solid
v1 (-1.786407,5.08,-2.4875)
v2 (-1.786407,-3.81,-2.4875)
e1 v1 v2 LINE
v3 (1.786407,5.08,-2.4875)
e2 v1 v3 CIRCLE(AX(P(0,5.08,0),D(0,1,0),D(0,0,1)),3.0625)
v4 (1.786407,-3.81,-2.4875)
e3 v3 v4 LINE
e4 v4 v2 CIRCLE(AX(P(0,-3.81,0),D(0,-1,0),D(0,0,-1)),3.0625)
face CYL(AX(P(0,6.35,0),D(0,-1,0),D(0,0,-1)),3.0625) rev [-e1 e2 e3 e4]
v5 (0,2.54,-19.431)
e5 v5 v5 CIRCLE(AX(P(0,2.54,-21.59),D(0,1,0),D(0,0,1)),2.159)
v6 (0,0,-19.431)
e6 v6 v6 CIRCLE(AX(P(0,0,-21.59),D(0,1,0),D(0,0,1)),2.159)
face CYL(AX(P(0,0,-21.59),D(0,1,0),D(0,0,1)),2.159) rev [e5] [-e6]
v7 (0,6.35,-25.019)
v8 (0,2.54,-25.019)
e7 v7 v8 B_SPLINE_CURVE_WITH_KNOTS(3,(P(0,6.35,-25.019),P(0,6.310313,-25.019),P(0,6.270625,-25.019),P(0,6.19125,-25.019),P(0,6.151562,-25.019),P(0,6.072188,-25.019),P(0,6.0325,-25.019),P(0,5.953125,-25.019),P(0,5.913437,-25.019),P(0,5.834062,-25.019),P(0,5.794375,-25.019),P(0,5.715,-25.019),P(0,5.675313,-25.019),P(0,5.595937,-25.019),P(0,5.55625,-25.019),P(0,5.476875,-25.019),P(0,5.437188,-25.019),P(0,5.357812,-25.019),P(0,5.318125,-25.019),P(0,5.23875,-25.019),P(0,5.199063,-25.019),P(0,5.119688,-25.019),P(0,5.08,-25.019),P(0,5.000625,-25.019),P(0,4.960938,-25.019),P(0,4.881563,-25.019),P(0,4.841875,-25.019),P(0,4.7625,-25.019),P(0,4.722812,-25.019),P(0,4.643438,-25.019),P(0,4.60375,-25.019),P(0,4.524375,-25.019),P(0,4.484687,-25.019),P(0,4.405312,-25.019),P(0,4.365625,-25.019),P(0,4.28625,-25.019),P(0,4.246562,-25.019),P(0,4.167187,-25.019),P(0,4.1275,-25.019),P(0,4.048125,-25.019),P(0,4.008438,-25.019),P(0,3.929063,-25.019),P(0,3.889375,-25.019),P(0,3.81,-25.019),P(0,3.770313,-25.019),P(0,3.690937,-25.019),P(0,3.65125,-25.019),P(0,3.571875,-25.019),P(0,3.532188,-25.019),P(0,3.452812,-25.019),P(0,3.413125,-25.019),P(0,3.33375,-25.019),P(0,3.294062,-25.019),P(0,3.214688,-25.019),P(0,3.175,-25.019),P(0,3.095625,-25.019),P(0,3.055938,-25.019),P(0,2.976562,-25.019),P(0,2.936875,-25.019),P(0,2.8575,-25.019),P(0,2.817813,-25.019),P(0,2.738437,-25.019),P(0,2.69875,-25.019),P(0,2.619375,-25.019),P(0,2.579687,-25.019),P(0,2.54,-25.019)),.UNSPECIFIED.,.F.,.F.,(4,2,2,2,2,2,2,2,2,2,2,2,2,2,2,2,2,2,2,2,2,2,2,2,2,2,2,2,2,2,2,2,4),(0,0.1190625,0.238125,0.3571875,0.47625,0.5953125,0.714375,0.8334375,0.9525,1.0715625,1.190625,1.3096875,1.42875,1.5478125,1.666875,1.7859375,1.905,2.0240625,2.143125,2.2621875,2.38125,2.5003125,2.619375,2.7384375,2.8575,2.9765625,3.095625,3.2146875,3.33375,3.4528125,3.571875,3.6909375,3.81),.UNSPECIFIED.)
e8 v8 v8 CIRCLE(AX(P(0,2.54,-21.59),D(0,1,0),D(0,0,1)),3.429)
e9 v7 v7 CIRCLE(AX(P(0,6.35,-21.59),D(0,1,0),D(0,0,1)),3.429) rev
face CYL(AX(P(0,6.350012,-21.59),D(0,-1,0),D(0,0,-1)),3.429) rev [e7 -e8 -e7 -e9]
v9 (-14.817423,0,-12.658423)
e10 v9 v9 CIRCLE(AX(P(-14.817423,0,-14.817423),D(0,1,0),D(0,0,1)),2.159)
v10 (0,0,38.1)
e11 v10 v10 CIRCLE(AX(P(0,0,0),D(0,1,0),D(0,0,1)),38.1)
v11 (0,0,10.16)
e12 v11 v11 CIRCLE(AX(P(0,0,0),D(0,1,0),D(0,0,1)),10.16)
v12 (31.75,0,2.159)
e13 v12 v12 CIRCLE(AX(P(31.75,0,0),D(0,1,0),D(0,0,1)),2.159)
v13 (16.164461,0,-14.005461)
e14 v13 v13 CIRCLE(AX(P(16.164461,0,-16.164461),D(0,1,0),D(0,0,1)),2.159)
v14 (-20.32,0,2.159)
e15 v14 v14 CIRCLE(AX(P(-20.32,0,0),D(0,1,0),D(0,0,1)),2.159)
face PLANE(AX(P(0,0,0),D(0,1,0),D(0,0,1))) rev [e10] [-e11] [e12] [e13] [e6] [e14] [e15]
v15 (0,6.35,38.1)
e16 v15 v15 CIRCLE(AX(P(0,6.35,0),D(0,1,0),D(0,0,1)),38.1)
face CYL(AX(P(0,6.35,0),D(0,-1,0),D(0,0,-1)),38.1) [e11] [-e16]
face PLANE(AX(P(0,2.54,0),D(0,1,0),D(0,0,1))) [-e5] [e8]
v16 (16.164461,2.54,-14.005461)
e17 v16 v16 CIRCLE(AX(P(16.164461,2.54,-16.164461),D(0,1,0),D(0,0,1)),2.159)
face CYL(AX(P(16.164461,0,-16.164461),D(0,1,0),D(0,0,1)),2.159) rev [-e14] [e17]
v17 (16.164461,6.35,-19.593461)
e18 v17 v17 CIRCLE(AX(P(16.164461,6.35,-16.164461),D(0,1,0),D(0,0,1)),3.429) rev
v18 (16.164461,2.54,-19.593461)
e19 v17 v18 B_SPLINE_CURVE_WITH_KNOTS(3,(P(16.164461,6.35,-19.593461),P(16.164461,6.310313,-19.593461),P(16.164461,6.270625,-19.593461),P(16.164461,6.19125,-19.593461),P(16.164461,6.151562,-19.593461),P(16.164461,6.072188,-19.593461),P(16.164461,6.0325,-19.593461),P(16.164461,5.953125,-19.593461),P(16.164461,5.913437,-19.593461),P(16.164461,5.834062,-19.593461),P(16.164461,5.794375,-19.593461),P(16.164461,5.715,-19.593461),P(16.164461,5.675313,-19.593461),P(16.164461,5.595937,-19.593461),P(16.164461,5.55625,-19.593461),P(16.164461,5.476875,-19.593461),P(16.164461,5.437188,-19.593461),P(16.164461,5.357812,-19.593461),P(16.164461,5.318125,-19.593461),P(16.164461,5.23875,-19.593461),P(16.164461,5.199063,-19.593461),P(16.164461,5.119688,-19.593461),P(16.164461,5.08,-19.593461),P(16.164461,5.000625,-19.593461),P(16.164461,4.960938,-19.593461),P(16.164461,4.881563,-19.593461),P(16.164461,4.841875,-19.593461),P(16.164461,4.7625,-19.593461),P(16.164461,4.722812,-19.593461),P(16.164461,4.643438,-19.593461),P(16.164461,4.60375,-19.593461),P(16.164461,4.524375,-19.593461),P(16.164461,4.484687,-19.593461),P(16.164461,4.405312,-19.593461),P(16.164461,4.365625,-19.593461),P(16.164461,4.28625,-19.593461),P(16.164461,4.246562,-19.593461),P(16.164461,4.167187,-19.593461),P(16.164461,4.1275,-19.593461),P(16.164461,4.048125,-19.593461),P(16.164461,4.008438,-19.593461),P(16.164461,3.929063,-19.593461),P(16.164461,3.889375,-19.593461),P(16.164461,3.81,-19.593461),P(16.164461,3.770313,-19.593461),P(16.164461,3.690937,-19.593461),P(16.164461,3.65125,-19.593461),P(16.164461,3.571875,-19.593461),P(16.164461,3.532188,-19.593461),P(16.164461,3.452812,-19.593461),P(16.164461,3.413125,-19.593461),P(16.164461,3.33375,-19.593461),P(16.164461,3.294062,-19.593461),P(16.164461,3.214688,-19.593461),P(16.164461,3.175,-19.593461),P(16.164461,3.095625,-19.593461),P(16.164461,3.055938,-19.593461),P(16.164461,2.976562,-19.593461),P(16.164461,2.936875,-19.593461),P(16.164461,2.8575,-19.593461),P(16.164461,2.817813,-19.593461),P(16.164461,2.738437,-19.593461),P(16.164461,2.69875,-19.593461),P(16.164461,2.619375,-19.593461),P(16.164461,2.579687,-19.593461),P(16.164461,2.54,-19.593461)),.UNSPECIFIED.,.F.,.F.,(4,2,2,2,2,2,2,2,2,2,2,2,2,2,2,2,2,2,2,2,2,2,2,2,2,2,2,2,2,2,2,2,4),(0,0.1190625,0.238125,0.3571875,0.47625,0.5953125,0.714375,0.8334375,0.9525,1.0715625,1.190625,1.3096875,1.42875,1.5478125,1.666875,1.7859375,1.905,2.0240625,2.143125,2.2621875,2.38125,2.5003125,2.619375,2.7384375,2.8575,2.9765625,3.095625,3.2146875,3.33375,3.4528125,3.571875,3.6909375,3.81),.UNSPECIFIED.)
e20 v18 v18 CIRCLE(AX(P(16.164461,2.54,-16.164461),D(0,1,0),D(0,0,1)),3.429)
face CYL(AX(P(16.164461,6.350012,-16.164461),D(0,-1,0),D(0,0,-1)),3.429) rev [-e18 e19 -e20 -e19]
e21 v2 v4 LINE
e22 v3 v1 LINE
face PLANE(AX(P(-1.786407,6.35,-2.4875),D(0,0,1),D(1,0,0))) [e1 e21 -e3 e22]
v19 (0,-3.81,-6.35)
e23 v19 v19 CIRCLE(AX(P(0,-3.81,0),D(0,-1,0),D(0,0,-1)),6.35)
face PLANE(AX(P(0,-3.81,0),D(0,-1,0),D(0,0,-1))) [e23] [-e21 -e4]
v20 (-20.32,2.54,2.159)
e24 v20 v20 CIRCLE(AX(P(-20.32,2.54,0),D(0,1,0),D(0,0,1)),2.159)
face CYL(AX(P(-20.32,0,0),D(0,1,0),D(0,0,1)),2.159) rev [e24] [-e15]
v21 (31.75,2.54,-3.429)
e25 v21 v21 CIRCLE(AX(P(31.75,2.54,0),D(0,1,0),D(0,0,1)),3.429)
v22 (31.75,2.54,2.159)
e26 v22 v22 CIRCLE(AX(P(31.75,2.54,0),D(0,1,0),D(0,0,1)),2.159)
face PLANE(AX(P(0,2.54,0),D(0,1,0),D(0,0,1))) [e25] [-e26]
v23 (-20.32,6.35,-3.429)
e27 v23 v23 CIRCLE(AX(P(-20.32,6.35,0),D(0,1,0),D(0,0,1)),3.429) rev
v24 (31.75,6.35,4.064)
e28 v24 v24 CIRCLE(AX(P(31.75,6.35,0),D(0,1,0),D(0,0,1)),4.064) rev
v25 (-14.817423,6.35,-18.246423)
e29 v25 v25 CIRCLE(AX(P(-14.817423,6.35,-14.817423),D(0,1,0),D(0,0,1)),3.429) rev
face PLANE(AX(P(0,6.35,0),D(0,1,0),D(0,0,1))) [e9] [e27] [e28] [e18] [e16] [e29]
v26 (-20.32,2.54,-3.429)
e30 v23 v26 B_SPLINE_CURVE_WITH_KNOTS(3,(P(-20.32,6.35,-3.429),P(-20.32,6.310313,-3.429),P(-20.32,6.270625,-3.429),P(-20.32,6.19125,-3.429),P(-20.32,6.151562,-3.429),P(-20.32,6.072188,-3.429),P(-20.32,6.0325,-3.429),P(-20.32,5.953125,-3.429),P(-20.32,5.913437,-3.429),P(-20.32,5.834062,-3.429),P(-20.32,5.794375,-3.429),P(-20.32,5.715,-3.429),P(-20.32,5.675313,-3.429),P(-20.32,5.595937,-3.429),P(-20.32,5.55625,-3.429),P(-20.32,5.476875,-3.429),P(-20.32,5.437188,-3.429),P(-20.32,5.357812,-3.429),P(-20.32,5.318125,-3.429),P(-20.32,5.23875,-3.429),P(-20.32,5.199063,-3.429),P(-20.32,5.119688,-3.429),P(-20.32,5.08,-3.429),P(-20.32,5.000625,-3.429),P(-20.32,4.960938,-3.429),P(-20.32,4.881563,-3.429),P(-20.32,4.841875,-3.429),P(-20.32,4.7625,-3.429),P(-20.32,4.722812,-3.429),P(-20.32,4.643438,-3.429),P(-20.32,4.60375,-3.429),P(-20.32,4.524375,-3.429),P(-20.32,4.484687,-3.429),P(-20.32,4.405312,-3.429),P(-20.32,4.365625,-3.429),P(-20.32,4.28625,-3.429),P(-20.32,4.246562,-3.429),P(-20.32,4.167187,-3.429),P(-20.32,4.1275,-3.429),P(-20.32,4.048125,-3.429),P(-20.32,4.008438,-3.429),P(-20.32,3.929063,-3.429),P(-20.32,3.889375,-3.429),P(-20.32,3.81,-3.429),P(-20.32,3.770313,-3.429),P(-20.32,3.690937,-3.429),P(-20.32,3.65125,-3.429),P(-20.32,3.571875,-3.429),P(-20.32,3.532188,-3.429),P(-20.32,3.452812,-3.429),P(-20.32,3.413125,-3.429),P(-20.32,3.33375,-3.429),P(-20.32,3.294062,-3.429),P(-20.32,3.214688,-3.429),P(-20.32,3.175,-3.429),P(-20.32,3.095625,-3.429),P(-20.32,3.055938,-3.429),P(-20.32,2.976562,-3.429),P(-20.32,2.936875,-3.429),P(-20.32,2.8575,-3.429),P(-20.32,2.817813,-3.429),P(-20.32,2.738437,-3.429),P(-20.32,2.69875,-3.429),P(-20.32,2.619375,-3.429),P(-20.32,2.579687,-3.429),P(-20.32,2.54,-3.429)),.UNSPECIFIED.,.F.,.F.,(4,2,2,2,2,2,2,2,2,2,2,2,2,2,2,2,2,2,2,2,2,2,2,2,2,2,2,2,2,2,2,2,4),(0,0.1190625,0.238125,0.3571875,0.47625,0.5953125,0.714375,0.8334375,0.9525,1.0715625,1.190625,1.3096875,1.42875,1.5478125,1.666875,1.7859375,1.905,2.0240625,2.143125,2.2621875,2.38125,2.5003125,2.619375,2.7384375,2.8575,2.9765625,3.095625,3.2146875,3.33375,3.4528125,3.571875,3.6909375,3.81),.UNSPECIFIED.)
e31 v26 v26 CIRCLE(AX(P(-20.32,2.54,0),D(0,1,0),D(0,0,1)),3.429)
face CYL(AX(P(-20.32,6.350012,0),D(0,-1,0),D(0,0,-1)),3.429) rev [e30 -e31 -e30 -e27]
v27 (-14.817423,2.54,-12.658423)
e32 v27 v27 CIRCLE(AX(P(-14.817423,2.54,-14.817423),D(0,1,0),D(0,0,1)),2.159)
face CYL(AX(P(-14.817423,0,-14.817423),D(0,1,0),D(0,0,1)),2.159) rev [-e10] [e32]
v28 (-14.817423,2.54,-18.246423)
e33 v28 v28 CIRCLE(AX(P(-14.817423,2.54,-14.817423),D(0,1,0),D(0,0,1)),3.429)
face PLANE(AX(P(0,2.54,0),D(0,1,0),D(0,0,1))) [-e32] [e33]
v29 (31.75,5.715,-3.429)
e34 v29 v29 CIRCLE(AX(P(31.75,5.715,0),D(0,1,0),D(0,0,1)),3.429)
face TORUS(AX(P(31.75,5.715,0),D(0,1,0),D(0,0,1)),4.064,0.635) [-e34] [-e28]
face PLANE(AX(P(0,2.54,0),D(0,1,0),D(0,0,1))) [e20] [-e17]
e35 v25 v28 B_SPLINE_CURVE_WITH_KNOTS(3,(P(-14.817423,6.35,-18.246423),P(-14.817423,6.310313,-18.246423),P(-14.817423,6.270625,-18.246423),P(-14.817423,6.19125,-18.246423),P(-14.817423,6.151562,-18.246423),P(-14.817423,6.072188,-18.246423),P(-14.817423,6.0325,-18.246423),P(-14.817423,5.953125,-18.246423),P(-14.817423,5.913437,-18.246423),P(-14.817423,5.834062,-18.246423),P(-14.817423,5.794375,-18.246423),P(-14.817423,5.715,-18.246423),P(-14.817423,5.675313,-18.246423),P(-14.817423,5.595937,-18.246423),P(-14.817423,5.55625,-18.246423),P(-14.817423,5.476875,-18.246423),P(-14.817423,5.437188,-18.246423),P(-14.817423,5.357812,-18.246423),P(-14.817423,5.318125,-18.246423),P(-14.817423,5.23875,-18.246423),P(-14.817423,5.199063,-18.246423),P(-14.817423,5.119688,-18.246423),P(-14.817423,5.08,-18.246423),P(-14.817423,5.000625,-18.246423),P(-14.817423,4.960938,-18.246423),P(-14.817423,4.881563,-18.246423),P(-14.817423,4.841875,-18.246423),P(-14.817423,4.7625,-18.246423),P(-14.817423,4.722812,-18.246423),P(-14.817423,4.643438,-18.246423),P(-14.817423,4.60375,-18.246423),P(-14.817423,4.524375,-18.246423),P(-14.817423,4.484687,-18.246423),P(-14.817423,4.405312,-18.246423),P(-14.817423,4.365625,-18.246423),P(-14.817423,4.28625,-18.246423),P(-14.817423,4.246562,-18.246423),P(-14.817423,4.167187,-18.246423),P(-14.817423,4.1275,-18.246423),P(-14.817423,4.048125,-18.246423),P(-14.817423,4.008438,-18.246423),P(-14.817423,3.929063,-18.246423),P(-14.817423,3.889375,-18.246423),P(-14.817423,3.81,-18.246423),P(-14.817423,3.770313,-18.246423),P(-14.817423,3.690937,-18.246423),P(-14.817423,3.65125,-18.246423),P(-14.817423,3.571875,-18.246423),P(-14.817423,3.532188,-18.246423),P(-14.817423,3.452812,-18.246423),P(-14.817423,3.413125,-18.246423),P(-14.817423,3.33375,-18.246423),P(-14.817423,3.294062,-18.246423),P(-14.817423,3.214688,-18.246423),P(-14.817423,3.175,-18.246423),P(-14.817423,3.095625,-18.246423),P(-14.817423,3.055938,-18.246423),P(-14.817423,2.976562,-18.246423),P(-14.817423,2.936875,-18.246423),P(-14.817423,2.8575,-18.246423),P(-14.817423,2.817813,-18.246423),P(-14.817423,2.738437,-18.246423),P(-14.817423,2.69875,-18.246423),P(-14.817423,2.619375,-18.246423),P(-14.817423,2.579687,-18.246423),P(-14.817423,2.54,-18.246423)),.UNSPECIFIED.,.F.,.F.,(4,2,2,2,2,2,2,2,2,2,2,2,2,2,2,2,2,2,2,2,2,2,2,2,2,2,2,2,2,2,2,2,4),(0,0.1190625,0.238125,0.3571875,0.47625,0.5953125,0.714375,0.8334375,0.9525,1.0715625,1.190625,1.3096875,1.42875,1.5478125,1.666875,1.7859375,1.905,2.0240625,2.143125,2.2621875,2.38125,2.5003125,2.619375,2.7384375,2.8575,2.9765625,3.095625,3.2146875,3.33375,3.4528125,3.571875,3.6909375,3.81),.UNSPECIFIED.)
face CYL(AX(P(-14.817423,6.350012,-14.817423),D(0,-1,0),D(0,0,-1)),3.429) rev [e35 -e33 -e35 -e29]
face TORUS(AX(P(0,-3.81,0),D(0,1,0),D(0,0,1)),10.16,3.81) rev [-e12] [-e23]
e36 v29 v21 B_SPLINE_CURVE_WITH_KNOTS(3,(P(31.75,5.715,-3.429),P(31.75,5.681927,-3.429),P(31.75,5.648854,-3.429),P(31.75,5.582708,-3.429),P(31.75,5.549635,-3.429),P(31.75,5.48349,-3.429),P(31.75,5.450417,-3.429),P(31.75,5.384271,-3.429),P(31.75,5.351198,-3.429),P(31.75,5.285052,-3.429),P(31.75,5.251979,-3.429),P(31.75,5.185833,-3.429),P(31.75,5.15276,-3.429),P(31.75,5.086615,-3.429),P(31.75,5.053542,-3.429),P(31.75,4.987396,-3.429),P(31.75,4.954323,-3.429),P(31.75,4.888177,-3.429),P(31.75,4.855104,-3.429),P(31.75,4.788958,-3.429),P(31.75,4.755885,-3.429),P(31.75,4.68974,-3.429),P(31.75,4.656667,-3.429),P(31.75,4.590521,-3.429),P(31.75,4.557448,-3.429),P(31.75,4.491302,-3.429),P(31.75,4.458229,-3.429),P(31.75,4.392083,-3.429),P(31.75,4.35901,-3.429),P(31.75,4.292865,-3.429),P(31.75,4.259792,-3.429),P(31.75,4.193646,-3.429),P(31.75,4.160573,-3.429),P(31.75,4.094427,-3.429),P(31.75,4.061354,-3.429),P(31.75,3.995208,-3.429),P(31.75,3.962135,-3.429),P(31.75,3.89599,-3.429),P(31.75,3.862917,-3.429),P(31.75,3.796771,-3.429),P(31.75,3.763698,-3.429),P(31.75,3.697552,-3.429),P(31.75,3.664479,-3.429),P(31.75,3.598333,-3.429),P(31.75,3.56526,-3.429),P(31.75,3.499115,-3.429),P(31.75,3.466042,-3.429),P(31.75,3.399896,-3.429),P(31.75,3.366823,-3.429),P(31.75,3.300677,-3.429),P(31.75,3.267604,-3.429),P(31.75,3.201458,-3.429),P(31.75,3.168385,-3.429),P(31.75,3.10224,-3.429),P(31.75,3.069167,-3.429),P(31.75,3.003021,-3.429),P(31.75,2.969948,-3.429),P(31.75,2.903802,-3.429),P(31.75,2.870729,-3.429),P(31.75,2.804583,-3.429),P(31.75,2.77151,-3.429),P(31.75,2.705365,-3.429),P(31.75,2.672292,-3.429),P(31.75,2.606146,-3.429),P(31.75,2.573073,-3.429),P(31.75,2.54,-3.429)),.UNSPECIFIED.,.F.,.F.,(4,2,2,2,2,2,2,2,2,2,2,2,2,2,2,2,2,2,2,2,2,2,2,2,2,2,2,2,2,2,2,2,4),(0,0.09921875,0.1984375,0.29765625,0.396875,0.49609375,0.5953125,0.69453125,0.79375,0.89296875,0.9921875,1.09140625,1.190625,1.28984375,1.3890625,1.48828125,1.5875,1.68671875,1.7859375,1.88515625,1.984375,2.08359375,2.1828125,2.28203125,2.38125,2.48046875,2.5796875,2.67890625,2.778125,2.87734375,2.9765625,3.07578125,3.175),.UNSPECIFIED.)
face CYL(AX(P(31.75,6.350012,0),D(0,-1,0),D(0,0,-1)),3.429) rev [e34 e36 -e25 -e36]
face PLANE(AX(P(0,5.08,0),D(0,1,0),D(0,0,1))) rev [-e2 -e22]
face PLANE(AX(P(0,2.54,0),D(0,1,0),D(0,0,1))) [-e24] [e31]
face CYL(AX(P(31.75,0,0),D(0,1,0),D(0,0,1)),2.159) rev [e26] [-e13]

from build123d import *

# Parameters (mm, degrees)
SKETCH1_R               = 38.1
BOSS_EXTRUDE1_DEPTH     = 6.35
CUT_EXTRUDE1_DEPTH      = 55.254423783
CUT_EXTRUDE1_DEPTH_BACK = 3.81
SKETCH2_R               = 3.429
CUT_EXTRUDE2_DEPTH      = 55.254423783
CUT_EXTRUDE2_DEPTH_BACK = 55.254423783
SKETCH2_3_R             = 2.159
SKETCH4_R               = 6.910573657
BOSS_EXTRUDE2_DEPTH     = 1.27
BOSS_EXTRUDE3_START     = 3.81
SKETCH5_R               = 6.35
BOSS_EXTRUDE3_DEPTH     = 3.81
FILLET1_R               = 3.81
FILLET2_R               = 0.635


with BuildPart() as part:
    # Sketch1 → Boss-Extrude1 (new body)
    with BuildSketch(Plane(origin=(0, 0, 0), x_dir=(1, 0, 0), z_dir=(0, 1, 0))):
        with Locations(Location((0, 0, 0), (0, 0, 270))):
            Circle(SKETCH1_R)
        with BuildLine():
            Line((-1.786407019, 2.487499957), (1.786407019, 2.487499957))
            ThreePointArc((1.786407019, 2.487499957), (0, -3.062499971), (-1.786407019, 2.487499957))
        make_face(mode=Mode.SUBTRACT)
    extrude(amount=BOSS_EXTRUDE1_DEPTH)

    # Sketch2 → Cut-Extrude1 (cut, two sides: drawn at the far end of the back side and taken through both)
    with BuildSketch(Plane(origin=(0, 6.35, 0), x_dir=(1, 0, 0), z_dir=(0, 1, 0)).offset(-CUT_EXTRUDE1_DEPTH_BACK)):
        with Locations(Location((-20.32, 0, 0), (0, 0, 90))):
            Circle(SKETCH2_R)
        with Locations(Location((-14.8174226, 14.8174226, 0), (0, 0, 90))):
            Circle(SKETCH2_R)
        with Locations(Location((0, 21.59, 0), (0, 0, 90))):
            Circle(SKETCH2_R)
        with Locations(Location((16.164461018, 16.164461018, 0), (0, 0, 90))):
            Circle(SKETCH2_R)
        with Locations(Location((31.75, 0, 0), (0, 0, 90))):
            Circle(SKETCH2_R)
    extrude(amount=CUT_EXTRUDE1_DEPTH + CUT_EXTRUDE1_DEPTH_BACK, mode=Mode.SUBTRACT)

    # Sketch2<3> → Cut-Extrude2 (cut, two sides: drawn at the far end of the back side and taken through both)
    with BuildSketch(Plane(origin=(0, 6.35, 0), x_dir=(1, 0, 0), z_dir=(0, 1, 0)).offset(-CUT_EXTRUDE2_DEPTH_BACK)):
        with Locations(Location((-20.32, 0, 0), (0, 0, 270))):
            Circle(SKETCH2_3_R)
        with Locations(Location((-14.8174226, 14.8174226, 0), (0, 0, 270))):
            Circle(SKETCH2_3_R)
        with Locations(Location((0, 21.59, 0), (0, 0, 270))):
            Circle(SKETCH2_3_R)
        with Locations(Location((16.164461018, 16.164461018, 0), (0, 0, 270))):
            Circle(SKETCH2_3_R)
        with Locations(Location((31.75, 0, 0), (0, 0, 270))):
            Circle(SKETCH2_3_R)
    extrude(amount=CUT_EXTRUDE2_DEPTH + CUT_EXTRUDE2_DEPTH_BACK, mode=Mode.SUBTRACT)

    # Sketch4 → Boss-Extrude2 (add)
    with BuildSketch(Plane(origin=(0, 6.35, 0), x_dir=(1, 0, 0), z_dir=(0, 1, 0))):
        Circle(SKETCH4_R)
    extrude(amount=-BOSS_EXTRUDE2_DEPTH)

    # Sketch5 → Boss-Extrude3 (add)
    with BuildSketch(Plane.XZ.offset(BOSS_EXTRUDE3_START)):
        with Locations(Location((0, 0, 0), (0, 0, 90))):
            Circle(SKETCH5_R)
        with BuildLine():
            Line((-1.786407019, -2.487499957), (1.786407019, -2.487499957))
            ThreePointArc((1.786407019, -2.487499957), (0, 3.062499971), (-1.786407019, -2.487499957))
        make_face(mode=Mode.SUBTRACT)
    extrude(amount=-BOSS_EXTRUDE3_DEPTH)

    # Fillet1
    fillet1_edges = [part.edges().sort_by_distance(p)[0] for p in [
        (0, 0, -6.35),
    ]]
    fillet(fillet1_edges, radius=FILLET1_R - 0.0001)  # a hair under: the kernel refuses the full size

    # Fillet2
    fillet2_edges = [part.edges().sort_by_distance(p)[0] for p in [
        (31.75, 6.35, 3.429),
    ]]
    fillet(fillet2_edges, radius=FILLET2_R)


solid = part.part
